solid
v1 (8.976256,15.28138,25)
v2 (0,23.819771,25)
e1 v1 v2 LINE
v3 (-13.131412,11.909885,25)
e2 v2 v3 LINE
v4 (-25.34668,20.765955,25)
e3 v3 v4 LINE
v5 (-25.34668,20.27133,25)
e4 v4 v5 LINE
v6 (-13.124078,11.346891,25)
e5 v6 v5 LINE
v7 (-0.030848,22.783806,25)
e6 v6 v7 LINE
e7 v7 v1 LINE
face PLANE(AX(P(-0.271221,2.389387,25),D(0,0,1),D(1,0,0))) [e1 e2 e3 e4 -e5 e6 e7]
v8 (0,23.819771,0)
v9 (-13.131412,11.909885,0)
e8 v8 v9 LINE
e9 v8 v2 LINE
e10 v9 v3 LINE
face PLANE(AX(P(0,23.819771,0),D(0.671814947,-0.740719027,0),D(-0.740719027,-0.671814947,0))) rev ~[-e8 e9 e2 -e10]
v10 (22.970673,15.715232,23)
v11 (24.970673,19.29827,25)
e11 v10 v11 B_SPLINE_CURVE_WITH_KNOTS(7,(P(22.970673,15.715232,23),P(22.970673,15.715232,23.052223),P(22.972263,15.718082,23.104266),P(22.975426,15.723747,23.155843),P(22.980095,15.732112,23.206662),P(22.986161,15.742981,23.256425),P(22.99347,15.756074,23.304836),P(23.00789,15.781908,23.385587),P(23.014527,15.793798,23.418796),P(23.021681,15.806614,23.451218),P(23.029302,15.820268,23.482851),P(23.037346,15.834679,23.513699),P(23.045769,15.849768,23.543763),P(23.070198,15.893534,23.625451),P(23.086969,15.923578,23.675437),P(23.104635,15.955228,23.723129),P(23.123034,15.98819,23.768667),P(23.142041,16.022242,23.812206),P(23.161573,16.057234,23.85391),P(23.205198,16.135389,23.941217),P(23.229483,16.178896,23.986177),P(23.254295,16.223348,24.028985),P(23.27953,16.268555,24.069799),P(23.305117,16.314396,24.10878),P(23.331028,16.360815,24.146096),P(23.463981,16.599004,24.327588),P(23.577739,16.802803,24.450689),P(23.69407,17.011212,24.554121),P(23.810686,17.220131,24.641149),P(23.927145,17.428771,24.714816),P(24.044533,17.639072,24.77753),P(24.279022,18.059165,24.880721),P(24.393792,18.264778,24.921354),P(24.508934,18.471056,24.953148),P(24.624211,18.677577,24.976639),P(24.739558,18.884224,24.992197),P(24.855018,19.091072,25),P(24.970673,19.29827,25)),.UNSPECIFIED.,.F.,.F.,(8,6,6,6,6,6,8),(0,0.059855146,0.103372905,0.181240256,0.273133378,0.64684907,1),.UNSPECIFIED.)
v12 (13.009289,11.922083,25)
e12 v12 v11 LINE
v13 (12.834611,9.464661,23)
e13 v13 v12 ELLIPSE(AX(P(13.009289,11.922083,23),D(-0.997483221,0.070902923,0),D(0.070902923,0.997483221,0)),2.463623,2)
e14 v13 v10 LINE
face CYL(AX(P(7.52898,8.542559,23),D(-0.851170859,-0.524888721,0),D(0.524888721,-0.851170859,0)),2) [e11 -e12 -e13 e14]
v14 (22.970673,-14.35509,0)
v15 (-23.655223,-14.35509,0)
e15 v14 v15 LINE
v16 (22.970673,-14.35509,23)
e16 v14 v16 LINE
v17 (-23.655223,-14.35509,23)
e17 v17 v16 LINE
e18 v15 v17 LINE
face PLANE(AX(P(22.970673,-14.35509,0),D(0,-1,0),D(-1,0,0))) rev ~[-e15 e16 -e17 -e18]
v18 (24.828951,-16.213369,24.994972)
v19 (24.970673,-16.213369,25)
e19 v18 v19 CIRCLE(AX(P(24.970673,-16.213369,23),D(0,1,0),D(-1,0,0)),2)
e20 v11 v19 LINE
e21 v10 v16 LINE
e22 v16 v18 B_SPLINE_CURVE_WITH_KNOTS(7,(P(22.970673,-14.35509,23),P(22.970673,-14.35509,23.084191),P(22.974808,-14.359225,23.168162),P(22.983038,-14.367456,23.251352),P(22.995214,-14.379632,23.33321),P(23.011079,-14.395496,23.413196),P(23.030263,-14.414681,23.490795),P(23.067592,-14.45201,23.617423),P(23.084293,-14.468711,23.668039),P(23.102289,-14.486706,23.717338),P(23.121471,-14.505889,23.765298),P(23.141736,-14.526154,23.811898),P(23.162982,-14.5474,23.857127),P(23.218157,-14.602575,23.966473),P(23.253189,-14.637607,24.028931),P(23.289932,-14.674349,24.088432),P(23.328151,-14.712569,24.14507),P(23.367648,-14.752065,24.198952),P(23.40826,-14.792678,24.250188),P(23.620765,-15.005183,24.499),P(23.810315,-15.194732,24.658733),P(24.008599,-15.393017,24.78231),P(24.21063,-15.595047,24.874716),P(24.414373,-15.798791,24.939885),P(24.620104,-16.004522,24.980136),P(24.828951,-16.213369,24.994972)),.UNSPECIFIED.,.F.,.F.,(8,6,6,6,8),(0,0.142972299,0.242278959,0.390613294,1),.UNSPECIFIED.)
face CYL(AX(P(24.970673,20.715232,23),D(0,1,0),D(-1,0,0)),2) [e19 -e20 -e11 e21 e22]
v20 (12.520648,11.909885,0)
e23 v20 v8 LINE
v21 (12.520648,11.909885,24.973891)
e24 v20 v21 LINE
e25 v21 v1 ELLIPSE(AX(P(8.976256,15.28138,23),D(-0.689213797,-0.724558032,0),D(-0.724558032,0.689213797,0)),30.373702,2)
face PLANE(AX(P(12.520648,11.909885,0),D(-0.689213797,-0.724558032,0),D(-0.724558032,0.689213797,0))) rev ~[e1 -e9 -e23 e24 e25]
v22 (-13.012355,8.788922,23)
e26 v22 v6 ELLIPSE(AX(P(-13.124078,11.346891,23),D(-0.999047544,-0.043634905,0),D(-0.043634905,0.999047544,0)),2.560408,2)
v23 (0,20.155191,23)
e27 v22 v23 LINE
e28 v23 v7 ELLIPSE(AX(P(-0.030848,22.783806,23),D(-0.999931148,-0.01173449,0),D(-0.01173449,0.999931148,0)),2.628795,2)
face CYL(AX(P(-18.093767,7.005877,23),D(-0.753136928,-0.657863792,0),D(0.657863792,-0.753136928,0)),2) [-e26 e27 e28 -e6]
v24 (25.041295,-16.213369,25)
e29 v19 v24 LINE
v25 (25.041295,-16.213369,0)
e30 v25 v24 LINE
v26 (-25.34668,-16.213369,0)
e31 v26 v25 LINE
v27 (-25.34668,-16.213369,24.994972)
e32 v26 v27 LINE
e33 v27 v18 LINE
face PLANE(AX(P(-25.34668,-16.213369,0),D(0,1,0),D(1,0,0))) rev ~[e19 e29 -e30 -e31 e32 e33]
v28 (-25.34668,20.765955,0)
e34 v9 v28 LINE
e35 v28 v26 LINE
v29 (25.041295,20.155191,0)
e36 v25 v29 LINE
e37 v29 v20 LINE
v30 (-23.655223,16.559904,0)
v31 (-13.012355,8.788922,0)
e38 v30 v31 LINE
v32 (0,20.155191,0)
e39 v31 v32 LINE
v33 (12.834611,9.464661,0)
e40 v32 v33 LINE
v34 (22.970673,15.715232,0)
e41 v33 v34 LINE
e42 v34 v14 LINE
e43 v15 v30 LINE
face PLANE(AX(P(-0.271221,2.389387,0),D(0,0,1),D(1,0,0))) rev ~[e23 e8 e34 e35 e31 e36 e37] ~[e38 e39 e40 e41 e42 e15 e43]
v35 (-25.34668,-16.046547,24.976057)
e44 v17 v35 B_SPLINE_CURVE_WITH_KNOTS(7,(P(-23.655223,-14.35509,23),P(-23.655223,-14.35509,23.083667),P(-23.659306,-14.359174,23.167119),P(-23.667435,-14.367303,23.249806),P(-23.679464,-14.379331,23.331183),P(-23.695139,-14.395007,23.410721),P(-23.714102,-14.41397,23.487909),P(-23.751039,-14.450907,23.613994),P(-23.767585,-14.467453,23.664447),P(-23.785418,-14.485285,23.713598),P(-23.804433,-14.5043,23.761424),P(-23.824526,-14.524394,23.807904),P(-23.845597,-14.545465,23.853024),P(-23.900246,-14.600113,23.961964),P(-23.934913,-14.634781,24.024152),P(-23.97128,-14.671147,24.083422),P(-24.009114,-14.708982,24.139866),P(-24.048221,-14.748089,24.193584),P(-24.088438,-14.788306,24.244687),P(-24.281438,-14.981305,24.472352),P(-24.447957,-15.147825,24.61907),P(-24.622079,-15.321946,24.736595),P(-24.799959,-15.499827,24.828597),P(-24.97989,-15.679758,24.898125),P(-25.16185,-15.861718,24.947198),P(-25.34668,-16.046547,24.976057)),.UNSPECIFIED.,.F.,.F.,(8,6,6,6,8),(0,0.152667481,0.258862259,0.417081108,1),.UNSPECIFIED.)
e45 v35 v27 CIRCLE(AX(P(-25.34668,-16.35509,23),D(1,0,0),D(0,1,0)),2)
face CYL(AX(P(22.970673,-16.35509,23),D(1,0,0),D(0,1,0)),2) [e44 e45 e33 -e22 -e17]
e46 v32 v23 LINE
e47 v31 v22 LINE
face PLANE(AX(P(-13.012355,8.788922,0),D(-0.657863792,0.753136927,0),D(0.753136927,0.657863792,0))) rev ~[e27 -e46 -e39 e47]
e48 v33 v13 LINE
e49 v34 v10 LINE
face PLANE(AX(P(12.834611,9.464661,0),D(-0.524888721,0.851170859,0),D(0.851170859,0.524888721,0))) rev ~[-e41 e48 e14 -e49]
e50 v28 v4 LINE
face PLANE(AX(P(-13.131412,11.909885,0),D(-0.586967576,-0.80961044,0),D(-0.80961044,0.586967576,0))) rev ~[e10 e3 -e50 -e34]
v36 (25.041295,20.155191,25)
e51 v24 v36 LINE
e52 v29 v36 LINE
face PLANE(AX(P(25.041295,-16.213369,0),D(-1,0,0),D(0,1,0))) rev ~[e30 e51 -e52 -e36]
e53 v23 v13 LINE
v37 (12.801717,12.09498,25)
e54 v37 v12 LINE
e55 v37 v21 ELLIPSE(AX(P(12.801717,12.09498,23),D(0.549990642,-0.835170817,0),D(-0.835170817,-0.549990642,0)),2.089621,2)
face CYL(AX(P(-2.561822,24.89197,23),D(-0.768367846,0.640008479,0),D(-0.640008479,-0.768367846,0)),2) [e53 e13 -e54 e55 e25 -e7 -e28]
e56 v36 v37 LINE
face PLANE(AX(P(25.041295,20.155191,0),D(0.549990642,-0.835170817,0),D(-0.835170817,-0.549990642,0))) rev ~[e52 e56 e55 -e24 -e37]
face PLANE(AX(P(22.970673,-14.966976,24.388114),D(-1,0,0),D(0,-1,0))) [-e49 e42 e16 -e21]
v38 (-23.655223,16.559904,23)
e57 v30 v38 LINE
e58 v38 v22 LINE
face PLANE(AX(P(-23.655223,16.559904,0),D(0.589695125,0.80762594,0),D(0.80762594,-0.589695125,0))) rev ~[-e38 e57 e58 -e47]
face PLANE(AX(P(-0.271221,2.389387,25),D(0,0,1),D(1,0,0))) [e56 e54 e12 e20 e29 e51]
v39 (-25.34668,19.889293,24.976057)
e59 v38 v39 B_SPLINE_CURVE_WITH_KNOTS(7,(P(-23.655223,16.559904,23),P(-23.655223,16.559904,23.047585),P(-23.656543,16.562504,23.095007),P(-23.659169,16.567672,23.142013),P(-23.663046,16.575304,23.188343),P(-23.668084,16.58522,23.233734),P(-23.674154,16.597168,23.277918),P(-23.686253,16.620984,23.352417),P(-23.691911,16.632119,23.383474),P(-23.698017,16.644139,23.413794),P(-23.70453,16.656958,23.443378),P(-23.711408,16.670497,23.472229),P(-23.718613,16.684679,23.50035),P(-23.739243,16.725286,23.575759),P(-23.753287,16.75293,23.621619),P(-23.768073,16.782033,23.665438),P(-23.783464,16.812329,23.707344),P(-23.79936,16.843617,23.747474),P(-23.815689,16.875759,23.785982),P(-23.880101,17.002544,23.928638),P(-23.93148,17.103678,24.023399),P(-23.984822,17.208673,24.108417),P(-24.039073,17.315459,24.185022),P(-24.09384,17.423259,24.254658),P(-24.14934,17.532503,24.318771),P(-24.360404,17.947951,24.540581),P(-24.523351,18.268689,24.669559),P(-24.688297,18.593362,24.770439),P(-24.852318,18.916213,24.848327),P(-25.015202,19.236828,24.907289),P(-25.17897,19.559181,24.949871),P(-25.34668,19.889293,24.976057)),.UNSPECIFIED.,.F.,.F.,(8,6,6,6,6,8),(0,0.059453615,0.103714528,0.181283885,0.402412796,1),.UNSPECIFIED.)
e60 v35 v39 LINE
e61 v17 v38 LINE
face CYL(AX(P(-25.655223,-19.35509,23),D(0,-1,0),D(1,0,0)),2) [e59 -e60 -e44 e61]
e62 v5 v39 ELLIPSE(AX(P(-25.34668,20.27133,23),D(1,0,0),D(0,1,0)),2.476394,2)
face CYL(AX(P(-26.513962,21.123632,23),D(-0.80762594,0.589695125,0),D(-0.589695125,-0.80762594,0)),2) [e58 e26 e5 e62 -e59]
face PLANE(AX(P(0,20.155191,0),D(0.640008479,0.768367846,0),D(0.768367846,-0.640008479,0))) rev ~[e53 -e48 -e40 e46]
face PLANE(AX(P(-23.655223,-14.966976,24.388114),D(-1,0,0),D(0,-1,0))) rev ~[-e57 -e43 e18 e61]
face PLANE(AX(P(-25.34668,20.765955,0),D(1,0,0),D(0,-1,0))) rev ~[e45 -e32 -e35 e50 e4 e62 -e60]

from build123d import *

# Parameters (mm, degrees)
F2_DEPTH     = 25
F3_T1_DEPTH  = 46.6258954257
F3_T6_DEPTH  = 35.914994888
F3_T11_DEPTH = 23.17796644
F3_T16_DEPTH = 27.2775423945
F3_T21_DEPTH = 26.7037330094
F3_T26_DEPTH = 21.9083744996
F3_T31_DEPTH = 35.0703225657
F3_T37_DEPTH = 51.6258954257
F3_T43_DEPTH = 40.914994888
F3_T52_DEPTH = 23.17796644
F3_T57_DEPTH = 35.914994888
F3_T66_DEPTH = 26.7037330094
F3_T71_DEPTH = 27.2775423945
F3_T79_DEPTH = 35.0703225657
F3_T84_DEPTH = 21.9083744996
F3_T92_DEPTH = 51.6258954257
F3_T98_DEPTH = 40.0703225657


# Not quite as in the source:
# - a fillet or chamfer that OpenCascade refuses, or shapes differently, is made with other operations: its cross-section is extruded or revolved along the edge and cut away or added


with BuildPart() as f2:
    # F0 (on Top) → F2 (new body)
    with BuildSketch(Plane.XY):
        Polygon((-25.346679613, 20.7659546286), (-25.346679613, 0), (-25.346679613, -16.2133686244), (25.0412952155, -16.2133686244), (25.0412952155, 0), (25.0412952155, 20.1551914215), (12.5206476077, 11.909885332), (0, 23.819770664), (-13.1314117461, 11.909885332), align=None)
        Polygon((-23.6552227288, -14.3550904468), (-23.6552227288, 16.5599044412), (-13.0123551935, 8.7889218703), (0, 20.1551914215), (12.8346113488, 9.4646606594), (22.9706726968, 15.715232119), (22.9706726968, -14.3550904468), align=None, mode=Mode.SUBTRACT)
    extrude(amount=F2_DEPTH)

    # F3: fillet of radius 2 on 7 edges, made by hand

    # F3_s2 → F3_t1 (cut)
    with BuildSketch(Plane.YZ.offset(-23.6552227288)):
        with BuildLine():
            ThreePointArc((-14.3550904468, 23), (-14.9408768844, 24.4142135624), (-16.3550904468, 25))
            Line((-16.3550904468, 25), (-14.3550904468, 25))
            Line((-14.3550904468, 25), (-14.3550904468, 23))
        make_face()
    extrude(amount=F3_T1_DEPTH, mode=Mode.SUBTRACT)


with BuildPart() as f3_tool4:
    # F3_s5 → F3_t6 (new body)
    with BuildSketch(Plane.XZ.offset(14.3550904468)):
        with BuildLine():
            ThreePointArc((-23.6552227288, 23), (-24.2410091665, 24.4142135624), (-25.6552227288, 25))
            Line((-25.6552227288, 25), (-23.6552227288, 25))
            Line((-23.6552227288, 25), (-23.6552227288, 23))
        make_face()
    extrude(amount=-F3_T6_DEPTH)

    split(bisect_by=Plane(origin=(-0.3391697192, -0.4645150547, 0), x_dir=(0, 0, 1), z_dir=(-0.5896951253, -0.8076259402, 0)), keep=Keep.TOP)


with BuildPart() as f2_1:
    add(f2.part)

    # F3_t3: cut F3_tool4
    add(f3_tool4.part, mode=Mode.SUBTRACT)


with BuildPart() as f3_tool9:
    # F3_s10 → F3_t11 (new body)
    with BuildSketch(Plane(origin=(-27.3541827104, 19.9728951224, 0), x_dir=(0, 0, 1), z_dir=(0.8076259402, -0.5896951253, 0))):
        with BuildLine():
            ThreePointArc((23, 0.5751611378), (24.4142135624, -0.0106252998), (25, -1.4248388622))
            Line((25, -1.4248388622), (25, 0.5751611378))
            Line((25, 0.5751611378), (23, 0.5751611378))
        make_face()
    extrude(amount=F3_T11_DEPTH)

    split(bisect_by=Plane.YZ.offset(-23.6552227288), keep=Keep.TOP)


with BuildPart() as f2_2:
    add(f2_1.part)

    # F3_t8: cut F3_tool9
    add(f3_tool9.part, mode=Mode.SUBTRACT)


with BuildPart() as f3_tool14:
    # F3_s15 → F3_t16 (new body)
    with BuildSketch(Plane(origin=(-6.7919181581, -5.9327286573, 0), x_dir=(0, 0, 1), z_dir=(0.7531369275, 0.6578637917, 0))):
        with BuildLine():
            ThreePointArc((23, -15.1796189401), (24.4142135624, -15.7654053777), (25, -17.1796189401))
            Line((25, -17.1796189401), (25, -15.1796189401))
            Line((25, -15.1796189401), (23, -15.1796189401))
        make_face()
    extrude(amount=F3_T16_DEPTH)

    split(bisect_by=Plane(origin=(9.9115559644, 11.8994062592, 0), x_dir=(0, 0, 1), z_dir=(-0.6400084793, -0.7683678458, 0)), keep=Keep.TOP)


with BuildPart() as f2_3:
    add(f2_2.part)

    # F3_t13: cut F3_tool14
    add(f3_tool14.part, mode=Mode.SUBTRACT)


with BuildPart() as f3_tool19:
    # F3_s20 → F3_t21 (new body)
    with BuildSketch(Plane(origin=(-13.7533951932, 11.4558275588, 0), x_dir=(0, 0, 1), z_dir=(0.7683678458, -0.6400084793, 0))):
        with BuildLine():
            ThreePointArc((23, -15.4866010137), (24.4142135624, -16.0723874513), (25, -17.4866010137))
            Line((25, -17.4866010137), (25, -15.4866010137))
            Line((25, -15.4866010137), (23, -15.4866010137))
        make_face()
    extrude(amount=F3_T21_DEPTH)

    split(bisect_by=Plane(origin=(-9.9861216728, 11.432331569, 0), x_dir=(0, 0, 1), z_dir=(0.6578637917, -0.7531369275, 0)), keep=Keep.TOP)


with BuildPart() as f2_4:
    add(f2_3.part)

    # F3_t18: cut F3_tool19
    add(f3_tool19.part, mode=Mode.SUBTRACT)


with BuildPart() as f3_tool24:
    # F3_s25 → F3_t26 (new body)
    with BuildSketch(Plane(origin=(9.271243063, 5.7172668253, 0), x_dir=(0, 0, 1), z_dir=(0.8511708587, 0.5248887209, 0))):
        with BuildLine():
            ThreePointArc((23, -1.3193006058), (24.4142135624, -1.9050870434), (25, -3.3193006058))
            Line((25, -3.3193006058), (25, -1.3193006058))
            Line((25, -1.3193006058), (23, -1.3193006058))
        make_face()
    extrude(amount=F3_T26_DEPTH)

    split(bisect_by=Plane.YZ.offset(22.9706726968), keep=Keep.BOTTOM)


with BuildPart() as f2_5:
    add(f2_4.part)

    # F3_t23: cut F3_tool24
    add(f3_tool24.part, mode=Mode.SUBTRACT)


with BuildPart() as f3_tool29:
    # F3_s30 → F3_t31 (new body)
    with BuildSketch(Plane.XZ.offset(-20.715232119)):
        with BuildLine():
            ThreePointArc((22.9706726968, 23), (23.5564591345, 24.4142135624), (24.9706726968, 25))
            Line((24.9706726968, 25), (22.9706726968, 25))
            Line((22.9706726968, 25), (22.9706726968, 23))
        make_face()
    extrude(amount=F3_T31_DEPTH)

    split(bisect_by=Plane(origin=(-0.6924860075, 1.1229502295, 0), x_dir=(0, 0, 1), z_dir=(0.5248887209, -0.8511708587, 0)), keep=Keep.TOP)


with BuildPart() as f2_6:
    add(f2_5.part)

    # F3_t28: cut F3_tool29
    add(f3_tool29.part, mode=Mode.SUBTRACT)


with BuildPart() as f3_tool35:
    # F3_s36 → F3_t37 (new body)
    with BuildSketch(Plane.YZ.offset(22.9706726968)):
        with BuildLine():
            ThreePointArc((-14.3550904468, 23), (-14.9408768844, 24.4142135624), (-16.3550904468, 25))
            Line((-16.3550904468, 25), (-14.3550904468, 25))
            Line((-14.3550904468, 25), (-14.3550904468, 23))
        make_face()
    extrude(amount=-F3_T37_DEPTH)

    split(bisect_by=Plane.YZ.offset(-25.346679613), keep=Keep.TOP)

    split(bisect_by=Plane.YZ.offset(-23.6552227288), keep=Keep.BOTTOM)

    split(bisect_by=Plane.XZ.offset(16.2133686244), keep=Keep.BOTTOM)


with BuildPart() as f3_tool41:
    # F3_s42 → F3_t43 (new body)
    with BuildSketch(Plane.XZ.offset(19.3550904468)):
        with BuildLine():
            ThreePointArc((-23.6552227288, 23), (-24.2410091665, 24.4142135624), (-25.6552227288, 25))
            Line((-25.6552227288, 25), (-23.6552227288, 25))
            Line((-23.6552227288, 25), (-23.6552227288, 23))
        make_face()
    extrude(amount=-F3_T43_DEPTH)

    split(bisect_by=Plane.YZ.offset(-25.346679613), keep=Keep.TOP)

    split(bisect_by=Plane.XZ.offset(14.3550904468), keep=Keep.TOP)

    split(bisect_by=Plane.XZ.offset(16.2133686244), keep=Keep.BOTTOM)


with BuildPart() as f3_tool35_1:
    add(f3_tool35.part)

    # F3_t47: intersect F3_tool41
    add(f3_tool41.part, mode=Mode.INTERSECT)


with BuildPart() as f2_7:
    add(f2_6.part)

    # F3_t33: cut F3_tool35
    add(f3_tool35_1.part, mode=Mode.SUBTRACT)


with BuildPart() as f3_tool50:
    # F3_s51 → F3_t52 (new body)
    with BuildSketch(Plane(origin=(-27.3541827104, 19.9728951224, 0), x_dir=(0, 0, 1), z_dir=(0.8076259402, -0.5896951253, 0))):
        with BuildLine():
            ThreePointArc((23, 0.5751611378), (24.4142135624, -0.0106252998), (25, -1.4248388622))
            Line((25, -1.4248388622), (25, 0.5751611378))
            Line((25, 0.5751611378), (23, 0.5751611378))
        make_face()
    extrude(amount=F3_T52_DEPTH)

    split(bisect_by=Plane.YZ.offset(-25.346679613), keep=Keep.TOP)

    split(bisect_by=Plane.YZ.offset(-23.6552227288), keep=Keep.BOTTOM)


with BuildPart() as f3_tool55:
    # F3_s56 → F3_t57 (new body)
    with BuildSketch(Plane.XZ.offset(14.3550904468)):
        with BuildLine():
            ThreePointArc((-23.6552227288, 23), (-24.2410091665, 24.4142135624), (-25.6552227288, 25))
            Line((-25.6552227288, 25), (-23.6552227288, 25))
            Line((-23.6552227288, 25), (-23.6552227288, 23))
        make_face()
    extrude(amount=-F3_T57_DEPTH)

    split(bisect_by=Plane.YZ.offset(-25.346679613), keep=Keep.TOP)

    split(bisect_by=Plane(origin=(-0.3391697192, -0.4645150547, 0), x_dir=(0, 0, 1), z_dir=(0.5896951253, 0.8076259402, 0)), keep=Keep.TOP)

    split(bisect_by=Plane(origin=(1.1355795164, 1.5663165579, 0), x_dir=(0, 0, 1), z_dir=(-0.5869675755, -0.8096104405, 0)), keep=Keep.TOP)


with BuildPart() as f3_tool50_1:
    add(f3_tool50.part)

    # F3_t61: intersect F3_tool55
    add(f3_tool55.part, mode=Mode.INTERSECT)


with BuildPart() as f2_8:
    add(f2_7.part)

    # F3_t48: cut F3_tool50
    add(f3_tool50_1.part, mode=Mode.SUBTRACT)


with BuildPart() as f3_tool64:
    # F3_s65 → F3_t66 (new body)
    with BuildSketch(Plane(origin=(-13.7533951932, 11.4558275588, 0), x_dir=(0, 0, 1), z_dir=(0.7683678458, -0.6400084793, 0))):
        with BuildLine():
            ThreePointArc((23, -15.4866010137), (24.4142135624, -16.0723874513), (25, -17.4866010137))
            Line((25, -17.4866010137), (25, -15.4866010137))
            Line((25, -15.4866010137), (23, -15.4866010137))
        make_face()
    extrude(amount=F3_T66_DEPTH)

    split(bisect_by=Plane(origin=(-9.9861216728, 11.432331569, 0), x_dir=(0, 0, 1), z_dir=(-0.6578637917, 0.7531369275, 0)), keep=Keep.TOP)

    split(bisect_by=Plane(origin=(-11.8533399075, 13.0690667923, 0), x_dir=(0, 0, 1), z_dir=(0.6718149465, -0.7407190274, 0)), keep=Keep.TOP)


with BuildPart() as f3_tool69:
    # F3_s70 → F3_t71 (new body)
    with BuildSketch(Plane(origin=(-6.7919181581, -5.9327286573, 0), x_dir=(0, 0, 1), z_dir=(0.7531369275, 0.6578637917, 0))):
        with BuildLine():
            ThreePointArc((23, -15.1796189401), (24.4142135624, -15.7654053777), (25, -17.1796189401))
            Line((25, -17.1796189401), (25, -15.1796189401))
            Line((25, -15.1796189401), (23, -15.1796189401))
        make_face()
    extrude(amount=F3_T71_DEPTH)

    split(bisect_by=Plane(origin=(9.9115559644, 11.8994062592, 0), x_dir=(0, 0, 1), z_dir=(0.6400084793, 0.7683678458, 0)), keep=Keep.TOP)

    split(bisect_by=Plane(origin=(11.8950073251, 12.5050066275, 0), x_dir=(0, 0, 1), z_dir=(-0.6892137971, -0.7245580322, 0)), keep=Keep.TOP)


with BuildPart() as f3_tool64_1:
    add(f3_tool64.part)

    # F3_t74: intersect F3_tool69
    add(f3_tool69.part, mode=Mode.INTERSECT)


with BuildPart() as f2_9:
    add(f2_8.part)

    # F3_t62: cut F3_tool64
    add(f3_tool64_1.part, mode=Mode.SUBTRACT)


with BuildPart() as f3_tool77:
    # F3_s78 → F3_t79 (new body)
    with BuildSketch(Plane.XZ.offset(-20.715232119)):
        with BuildLine():
            ThreePointArc((22.9706726968, 23), (23.5564591345, 24.4142135624), (24.9706726968, 25))
            Line((24.9706726968, 25), (22.9706726968, 25))
            Line((22.9706726968, 25), (22.9706726968, 23))
        make_face()
    extrude(amount=F3_T79_DEPTH)

    split(bisect_by=Plane(origin=(-0.6924860075, 1.1229502295, 0), x_dir=(0, 0, 1), z_dir=(-0.5248887209, 0.8511708587, 0)), keep=Keep.TOP)

    split(bisect_by=Plane(origin=(-1.6832736623, 2.556081742, 0), x_dir=(0, 0, 1), z_dir=(0.5499906424, -0.8351708168, 0)), keep=Keep.TOP)


with BuildPart() as f3_tool82:
    # F3_s83 → F3_t84 (new body)
    with BuildSketch(Plane(origin=(9.271243063, 5.7172668253, 0), x_dir=(0, 0, 1), z_dir=(0.8511708587, 0.5248887209, 0))):
        with BuildLine():
            ThreePointArc((23, -1.3193006058), (24.4142135624, -1.9050870434), (25, -3.3193006058))
            Line((25, -3.3193006058), (25, -1.3193006058))
            Line((25, -1.3193006058), (23, -1.3193006058))
        make_face()
    extrude(amount=F3_T84_DEPTH)

    split(bisect_by=Plane.YZ.offset(22.9706726968), keep=Keep.TOP)

    split(bisect_by=Plane.YZ.offset(25.0412952155), keep=Keep.BOTTOM)


with BuildPart() as f3_tool77_1:
    add(f3_tool77.part)

    # F3_t87: intersect F3_tool82
    add(f3_tool82.part, mode=Mode.INTERSECT)


with BuildPart() as f2_10:
    add(f2_9.part)

    # F3_t75: cut F3_tool77
    add(f3_tool77_1.part, mode=Mode.SUBTRACT)


with BuildPart() as f3_tool90:
    # F3_s91 → F3_t92 (new body)
    with BuildSketch(Plane.YZ.offset(27.9706726968)):
        with BuildLine():
            ThreePointArc((-14.3550904468, 23), (-14.9408768844, 24.4142135624), (-16.3550904468, 25))
            Line((-16.3550904468, 25), (-14.3550904468, 25))
            Line((-14.3550904468, 25), (-14.3550904468, 23))
        make_face()
    extrude(amount=-F3_T92_DEPTH)

    split(bisect_by=Plane.YZ.offset(22.9706726968), keep=Keep.TOP)

    split(bisect_by=Plane.YZ.offset(25.0412952155), keep=Keep.BOTTOM)

    split(bisect_by=Plane.XZ.offset(16.2133686244), keep=Keep.BOTTOM)


with BuildPart() as f3_tool96:
    # F3_s97 → F3_t98 (new body)
    with BuildSketch(Plane.XZ.offset(-20.715232119)):
        with BuildLine():
            ThreePointArc((22.9706726968, 23), (23.5564591345, 24.4142135624), (24.9706726968, 25))
            Line((24.9706726968, 25), (22.9706726968, 25))
            Line((22.9706726968, 25), (22.9706726968, 23))
        make_face()
    extrude(amount=F3_T98_DEPTH)

    split(bisect_by=Plane.XZ.offset(14.3550904468), keep=Keep.TOP)

    split(bisect_by=Plane.XZ.offset(16.2133686244), keep=Keep.BOTTOM)


with BuildPart() as f3_tool90_1:
    add(f3_tool90.part)

    # F3_t101: intersect F3_tool96
    add(f3_tool96.part, mode=Mode.INTERSECT)


with BuildPart() as f2_11:
    add(f2_10.part)

    # F3_t88: cut F3_tool90
    add(f3_tool90_1.part, mode=Mode.SUBTRACT)


solid = f2_11.part
